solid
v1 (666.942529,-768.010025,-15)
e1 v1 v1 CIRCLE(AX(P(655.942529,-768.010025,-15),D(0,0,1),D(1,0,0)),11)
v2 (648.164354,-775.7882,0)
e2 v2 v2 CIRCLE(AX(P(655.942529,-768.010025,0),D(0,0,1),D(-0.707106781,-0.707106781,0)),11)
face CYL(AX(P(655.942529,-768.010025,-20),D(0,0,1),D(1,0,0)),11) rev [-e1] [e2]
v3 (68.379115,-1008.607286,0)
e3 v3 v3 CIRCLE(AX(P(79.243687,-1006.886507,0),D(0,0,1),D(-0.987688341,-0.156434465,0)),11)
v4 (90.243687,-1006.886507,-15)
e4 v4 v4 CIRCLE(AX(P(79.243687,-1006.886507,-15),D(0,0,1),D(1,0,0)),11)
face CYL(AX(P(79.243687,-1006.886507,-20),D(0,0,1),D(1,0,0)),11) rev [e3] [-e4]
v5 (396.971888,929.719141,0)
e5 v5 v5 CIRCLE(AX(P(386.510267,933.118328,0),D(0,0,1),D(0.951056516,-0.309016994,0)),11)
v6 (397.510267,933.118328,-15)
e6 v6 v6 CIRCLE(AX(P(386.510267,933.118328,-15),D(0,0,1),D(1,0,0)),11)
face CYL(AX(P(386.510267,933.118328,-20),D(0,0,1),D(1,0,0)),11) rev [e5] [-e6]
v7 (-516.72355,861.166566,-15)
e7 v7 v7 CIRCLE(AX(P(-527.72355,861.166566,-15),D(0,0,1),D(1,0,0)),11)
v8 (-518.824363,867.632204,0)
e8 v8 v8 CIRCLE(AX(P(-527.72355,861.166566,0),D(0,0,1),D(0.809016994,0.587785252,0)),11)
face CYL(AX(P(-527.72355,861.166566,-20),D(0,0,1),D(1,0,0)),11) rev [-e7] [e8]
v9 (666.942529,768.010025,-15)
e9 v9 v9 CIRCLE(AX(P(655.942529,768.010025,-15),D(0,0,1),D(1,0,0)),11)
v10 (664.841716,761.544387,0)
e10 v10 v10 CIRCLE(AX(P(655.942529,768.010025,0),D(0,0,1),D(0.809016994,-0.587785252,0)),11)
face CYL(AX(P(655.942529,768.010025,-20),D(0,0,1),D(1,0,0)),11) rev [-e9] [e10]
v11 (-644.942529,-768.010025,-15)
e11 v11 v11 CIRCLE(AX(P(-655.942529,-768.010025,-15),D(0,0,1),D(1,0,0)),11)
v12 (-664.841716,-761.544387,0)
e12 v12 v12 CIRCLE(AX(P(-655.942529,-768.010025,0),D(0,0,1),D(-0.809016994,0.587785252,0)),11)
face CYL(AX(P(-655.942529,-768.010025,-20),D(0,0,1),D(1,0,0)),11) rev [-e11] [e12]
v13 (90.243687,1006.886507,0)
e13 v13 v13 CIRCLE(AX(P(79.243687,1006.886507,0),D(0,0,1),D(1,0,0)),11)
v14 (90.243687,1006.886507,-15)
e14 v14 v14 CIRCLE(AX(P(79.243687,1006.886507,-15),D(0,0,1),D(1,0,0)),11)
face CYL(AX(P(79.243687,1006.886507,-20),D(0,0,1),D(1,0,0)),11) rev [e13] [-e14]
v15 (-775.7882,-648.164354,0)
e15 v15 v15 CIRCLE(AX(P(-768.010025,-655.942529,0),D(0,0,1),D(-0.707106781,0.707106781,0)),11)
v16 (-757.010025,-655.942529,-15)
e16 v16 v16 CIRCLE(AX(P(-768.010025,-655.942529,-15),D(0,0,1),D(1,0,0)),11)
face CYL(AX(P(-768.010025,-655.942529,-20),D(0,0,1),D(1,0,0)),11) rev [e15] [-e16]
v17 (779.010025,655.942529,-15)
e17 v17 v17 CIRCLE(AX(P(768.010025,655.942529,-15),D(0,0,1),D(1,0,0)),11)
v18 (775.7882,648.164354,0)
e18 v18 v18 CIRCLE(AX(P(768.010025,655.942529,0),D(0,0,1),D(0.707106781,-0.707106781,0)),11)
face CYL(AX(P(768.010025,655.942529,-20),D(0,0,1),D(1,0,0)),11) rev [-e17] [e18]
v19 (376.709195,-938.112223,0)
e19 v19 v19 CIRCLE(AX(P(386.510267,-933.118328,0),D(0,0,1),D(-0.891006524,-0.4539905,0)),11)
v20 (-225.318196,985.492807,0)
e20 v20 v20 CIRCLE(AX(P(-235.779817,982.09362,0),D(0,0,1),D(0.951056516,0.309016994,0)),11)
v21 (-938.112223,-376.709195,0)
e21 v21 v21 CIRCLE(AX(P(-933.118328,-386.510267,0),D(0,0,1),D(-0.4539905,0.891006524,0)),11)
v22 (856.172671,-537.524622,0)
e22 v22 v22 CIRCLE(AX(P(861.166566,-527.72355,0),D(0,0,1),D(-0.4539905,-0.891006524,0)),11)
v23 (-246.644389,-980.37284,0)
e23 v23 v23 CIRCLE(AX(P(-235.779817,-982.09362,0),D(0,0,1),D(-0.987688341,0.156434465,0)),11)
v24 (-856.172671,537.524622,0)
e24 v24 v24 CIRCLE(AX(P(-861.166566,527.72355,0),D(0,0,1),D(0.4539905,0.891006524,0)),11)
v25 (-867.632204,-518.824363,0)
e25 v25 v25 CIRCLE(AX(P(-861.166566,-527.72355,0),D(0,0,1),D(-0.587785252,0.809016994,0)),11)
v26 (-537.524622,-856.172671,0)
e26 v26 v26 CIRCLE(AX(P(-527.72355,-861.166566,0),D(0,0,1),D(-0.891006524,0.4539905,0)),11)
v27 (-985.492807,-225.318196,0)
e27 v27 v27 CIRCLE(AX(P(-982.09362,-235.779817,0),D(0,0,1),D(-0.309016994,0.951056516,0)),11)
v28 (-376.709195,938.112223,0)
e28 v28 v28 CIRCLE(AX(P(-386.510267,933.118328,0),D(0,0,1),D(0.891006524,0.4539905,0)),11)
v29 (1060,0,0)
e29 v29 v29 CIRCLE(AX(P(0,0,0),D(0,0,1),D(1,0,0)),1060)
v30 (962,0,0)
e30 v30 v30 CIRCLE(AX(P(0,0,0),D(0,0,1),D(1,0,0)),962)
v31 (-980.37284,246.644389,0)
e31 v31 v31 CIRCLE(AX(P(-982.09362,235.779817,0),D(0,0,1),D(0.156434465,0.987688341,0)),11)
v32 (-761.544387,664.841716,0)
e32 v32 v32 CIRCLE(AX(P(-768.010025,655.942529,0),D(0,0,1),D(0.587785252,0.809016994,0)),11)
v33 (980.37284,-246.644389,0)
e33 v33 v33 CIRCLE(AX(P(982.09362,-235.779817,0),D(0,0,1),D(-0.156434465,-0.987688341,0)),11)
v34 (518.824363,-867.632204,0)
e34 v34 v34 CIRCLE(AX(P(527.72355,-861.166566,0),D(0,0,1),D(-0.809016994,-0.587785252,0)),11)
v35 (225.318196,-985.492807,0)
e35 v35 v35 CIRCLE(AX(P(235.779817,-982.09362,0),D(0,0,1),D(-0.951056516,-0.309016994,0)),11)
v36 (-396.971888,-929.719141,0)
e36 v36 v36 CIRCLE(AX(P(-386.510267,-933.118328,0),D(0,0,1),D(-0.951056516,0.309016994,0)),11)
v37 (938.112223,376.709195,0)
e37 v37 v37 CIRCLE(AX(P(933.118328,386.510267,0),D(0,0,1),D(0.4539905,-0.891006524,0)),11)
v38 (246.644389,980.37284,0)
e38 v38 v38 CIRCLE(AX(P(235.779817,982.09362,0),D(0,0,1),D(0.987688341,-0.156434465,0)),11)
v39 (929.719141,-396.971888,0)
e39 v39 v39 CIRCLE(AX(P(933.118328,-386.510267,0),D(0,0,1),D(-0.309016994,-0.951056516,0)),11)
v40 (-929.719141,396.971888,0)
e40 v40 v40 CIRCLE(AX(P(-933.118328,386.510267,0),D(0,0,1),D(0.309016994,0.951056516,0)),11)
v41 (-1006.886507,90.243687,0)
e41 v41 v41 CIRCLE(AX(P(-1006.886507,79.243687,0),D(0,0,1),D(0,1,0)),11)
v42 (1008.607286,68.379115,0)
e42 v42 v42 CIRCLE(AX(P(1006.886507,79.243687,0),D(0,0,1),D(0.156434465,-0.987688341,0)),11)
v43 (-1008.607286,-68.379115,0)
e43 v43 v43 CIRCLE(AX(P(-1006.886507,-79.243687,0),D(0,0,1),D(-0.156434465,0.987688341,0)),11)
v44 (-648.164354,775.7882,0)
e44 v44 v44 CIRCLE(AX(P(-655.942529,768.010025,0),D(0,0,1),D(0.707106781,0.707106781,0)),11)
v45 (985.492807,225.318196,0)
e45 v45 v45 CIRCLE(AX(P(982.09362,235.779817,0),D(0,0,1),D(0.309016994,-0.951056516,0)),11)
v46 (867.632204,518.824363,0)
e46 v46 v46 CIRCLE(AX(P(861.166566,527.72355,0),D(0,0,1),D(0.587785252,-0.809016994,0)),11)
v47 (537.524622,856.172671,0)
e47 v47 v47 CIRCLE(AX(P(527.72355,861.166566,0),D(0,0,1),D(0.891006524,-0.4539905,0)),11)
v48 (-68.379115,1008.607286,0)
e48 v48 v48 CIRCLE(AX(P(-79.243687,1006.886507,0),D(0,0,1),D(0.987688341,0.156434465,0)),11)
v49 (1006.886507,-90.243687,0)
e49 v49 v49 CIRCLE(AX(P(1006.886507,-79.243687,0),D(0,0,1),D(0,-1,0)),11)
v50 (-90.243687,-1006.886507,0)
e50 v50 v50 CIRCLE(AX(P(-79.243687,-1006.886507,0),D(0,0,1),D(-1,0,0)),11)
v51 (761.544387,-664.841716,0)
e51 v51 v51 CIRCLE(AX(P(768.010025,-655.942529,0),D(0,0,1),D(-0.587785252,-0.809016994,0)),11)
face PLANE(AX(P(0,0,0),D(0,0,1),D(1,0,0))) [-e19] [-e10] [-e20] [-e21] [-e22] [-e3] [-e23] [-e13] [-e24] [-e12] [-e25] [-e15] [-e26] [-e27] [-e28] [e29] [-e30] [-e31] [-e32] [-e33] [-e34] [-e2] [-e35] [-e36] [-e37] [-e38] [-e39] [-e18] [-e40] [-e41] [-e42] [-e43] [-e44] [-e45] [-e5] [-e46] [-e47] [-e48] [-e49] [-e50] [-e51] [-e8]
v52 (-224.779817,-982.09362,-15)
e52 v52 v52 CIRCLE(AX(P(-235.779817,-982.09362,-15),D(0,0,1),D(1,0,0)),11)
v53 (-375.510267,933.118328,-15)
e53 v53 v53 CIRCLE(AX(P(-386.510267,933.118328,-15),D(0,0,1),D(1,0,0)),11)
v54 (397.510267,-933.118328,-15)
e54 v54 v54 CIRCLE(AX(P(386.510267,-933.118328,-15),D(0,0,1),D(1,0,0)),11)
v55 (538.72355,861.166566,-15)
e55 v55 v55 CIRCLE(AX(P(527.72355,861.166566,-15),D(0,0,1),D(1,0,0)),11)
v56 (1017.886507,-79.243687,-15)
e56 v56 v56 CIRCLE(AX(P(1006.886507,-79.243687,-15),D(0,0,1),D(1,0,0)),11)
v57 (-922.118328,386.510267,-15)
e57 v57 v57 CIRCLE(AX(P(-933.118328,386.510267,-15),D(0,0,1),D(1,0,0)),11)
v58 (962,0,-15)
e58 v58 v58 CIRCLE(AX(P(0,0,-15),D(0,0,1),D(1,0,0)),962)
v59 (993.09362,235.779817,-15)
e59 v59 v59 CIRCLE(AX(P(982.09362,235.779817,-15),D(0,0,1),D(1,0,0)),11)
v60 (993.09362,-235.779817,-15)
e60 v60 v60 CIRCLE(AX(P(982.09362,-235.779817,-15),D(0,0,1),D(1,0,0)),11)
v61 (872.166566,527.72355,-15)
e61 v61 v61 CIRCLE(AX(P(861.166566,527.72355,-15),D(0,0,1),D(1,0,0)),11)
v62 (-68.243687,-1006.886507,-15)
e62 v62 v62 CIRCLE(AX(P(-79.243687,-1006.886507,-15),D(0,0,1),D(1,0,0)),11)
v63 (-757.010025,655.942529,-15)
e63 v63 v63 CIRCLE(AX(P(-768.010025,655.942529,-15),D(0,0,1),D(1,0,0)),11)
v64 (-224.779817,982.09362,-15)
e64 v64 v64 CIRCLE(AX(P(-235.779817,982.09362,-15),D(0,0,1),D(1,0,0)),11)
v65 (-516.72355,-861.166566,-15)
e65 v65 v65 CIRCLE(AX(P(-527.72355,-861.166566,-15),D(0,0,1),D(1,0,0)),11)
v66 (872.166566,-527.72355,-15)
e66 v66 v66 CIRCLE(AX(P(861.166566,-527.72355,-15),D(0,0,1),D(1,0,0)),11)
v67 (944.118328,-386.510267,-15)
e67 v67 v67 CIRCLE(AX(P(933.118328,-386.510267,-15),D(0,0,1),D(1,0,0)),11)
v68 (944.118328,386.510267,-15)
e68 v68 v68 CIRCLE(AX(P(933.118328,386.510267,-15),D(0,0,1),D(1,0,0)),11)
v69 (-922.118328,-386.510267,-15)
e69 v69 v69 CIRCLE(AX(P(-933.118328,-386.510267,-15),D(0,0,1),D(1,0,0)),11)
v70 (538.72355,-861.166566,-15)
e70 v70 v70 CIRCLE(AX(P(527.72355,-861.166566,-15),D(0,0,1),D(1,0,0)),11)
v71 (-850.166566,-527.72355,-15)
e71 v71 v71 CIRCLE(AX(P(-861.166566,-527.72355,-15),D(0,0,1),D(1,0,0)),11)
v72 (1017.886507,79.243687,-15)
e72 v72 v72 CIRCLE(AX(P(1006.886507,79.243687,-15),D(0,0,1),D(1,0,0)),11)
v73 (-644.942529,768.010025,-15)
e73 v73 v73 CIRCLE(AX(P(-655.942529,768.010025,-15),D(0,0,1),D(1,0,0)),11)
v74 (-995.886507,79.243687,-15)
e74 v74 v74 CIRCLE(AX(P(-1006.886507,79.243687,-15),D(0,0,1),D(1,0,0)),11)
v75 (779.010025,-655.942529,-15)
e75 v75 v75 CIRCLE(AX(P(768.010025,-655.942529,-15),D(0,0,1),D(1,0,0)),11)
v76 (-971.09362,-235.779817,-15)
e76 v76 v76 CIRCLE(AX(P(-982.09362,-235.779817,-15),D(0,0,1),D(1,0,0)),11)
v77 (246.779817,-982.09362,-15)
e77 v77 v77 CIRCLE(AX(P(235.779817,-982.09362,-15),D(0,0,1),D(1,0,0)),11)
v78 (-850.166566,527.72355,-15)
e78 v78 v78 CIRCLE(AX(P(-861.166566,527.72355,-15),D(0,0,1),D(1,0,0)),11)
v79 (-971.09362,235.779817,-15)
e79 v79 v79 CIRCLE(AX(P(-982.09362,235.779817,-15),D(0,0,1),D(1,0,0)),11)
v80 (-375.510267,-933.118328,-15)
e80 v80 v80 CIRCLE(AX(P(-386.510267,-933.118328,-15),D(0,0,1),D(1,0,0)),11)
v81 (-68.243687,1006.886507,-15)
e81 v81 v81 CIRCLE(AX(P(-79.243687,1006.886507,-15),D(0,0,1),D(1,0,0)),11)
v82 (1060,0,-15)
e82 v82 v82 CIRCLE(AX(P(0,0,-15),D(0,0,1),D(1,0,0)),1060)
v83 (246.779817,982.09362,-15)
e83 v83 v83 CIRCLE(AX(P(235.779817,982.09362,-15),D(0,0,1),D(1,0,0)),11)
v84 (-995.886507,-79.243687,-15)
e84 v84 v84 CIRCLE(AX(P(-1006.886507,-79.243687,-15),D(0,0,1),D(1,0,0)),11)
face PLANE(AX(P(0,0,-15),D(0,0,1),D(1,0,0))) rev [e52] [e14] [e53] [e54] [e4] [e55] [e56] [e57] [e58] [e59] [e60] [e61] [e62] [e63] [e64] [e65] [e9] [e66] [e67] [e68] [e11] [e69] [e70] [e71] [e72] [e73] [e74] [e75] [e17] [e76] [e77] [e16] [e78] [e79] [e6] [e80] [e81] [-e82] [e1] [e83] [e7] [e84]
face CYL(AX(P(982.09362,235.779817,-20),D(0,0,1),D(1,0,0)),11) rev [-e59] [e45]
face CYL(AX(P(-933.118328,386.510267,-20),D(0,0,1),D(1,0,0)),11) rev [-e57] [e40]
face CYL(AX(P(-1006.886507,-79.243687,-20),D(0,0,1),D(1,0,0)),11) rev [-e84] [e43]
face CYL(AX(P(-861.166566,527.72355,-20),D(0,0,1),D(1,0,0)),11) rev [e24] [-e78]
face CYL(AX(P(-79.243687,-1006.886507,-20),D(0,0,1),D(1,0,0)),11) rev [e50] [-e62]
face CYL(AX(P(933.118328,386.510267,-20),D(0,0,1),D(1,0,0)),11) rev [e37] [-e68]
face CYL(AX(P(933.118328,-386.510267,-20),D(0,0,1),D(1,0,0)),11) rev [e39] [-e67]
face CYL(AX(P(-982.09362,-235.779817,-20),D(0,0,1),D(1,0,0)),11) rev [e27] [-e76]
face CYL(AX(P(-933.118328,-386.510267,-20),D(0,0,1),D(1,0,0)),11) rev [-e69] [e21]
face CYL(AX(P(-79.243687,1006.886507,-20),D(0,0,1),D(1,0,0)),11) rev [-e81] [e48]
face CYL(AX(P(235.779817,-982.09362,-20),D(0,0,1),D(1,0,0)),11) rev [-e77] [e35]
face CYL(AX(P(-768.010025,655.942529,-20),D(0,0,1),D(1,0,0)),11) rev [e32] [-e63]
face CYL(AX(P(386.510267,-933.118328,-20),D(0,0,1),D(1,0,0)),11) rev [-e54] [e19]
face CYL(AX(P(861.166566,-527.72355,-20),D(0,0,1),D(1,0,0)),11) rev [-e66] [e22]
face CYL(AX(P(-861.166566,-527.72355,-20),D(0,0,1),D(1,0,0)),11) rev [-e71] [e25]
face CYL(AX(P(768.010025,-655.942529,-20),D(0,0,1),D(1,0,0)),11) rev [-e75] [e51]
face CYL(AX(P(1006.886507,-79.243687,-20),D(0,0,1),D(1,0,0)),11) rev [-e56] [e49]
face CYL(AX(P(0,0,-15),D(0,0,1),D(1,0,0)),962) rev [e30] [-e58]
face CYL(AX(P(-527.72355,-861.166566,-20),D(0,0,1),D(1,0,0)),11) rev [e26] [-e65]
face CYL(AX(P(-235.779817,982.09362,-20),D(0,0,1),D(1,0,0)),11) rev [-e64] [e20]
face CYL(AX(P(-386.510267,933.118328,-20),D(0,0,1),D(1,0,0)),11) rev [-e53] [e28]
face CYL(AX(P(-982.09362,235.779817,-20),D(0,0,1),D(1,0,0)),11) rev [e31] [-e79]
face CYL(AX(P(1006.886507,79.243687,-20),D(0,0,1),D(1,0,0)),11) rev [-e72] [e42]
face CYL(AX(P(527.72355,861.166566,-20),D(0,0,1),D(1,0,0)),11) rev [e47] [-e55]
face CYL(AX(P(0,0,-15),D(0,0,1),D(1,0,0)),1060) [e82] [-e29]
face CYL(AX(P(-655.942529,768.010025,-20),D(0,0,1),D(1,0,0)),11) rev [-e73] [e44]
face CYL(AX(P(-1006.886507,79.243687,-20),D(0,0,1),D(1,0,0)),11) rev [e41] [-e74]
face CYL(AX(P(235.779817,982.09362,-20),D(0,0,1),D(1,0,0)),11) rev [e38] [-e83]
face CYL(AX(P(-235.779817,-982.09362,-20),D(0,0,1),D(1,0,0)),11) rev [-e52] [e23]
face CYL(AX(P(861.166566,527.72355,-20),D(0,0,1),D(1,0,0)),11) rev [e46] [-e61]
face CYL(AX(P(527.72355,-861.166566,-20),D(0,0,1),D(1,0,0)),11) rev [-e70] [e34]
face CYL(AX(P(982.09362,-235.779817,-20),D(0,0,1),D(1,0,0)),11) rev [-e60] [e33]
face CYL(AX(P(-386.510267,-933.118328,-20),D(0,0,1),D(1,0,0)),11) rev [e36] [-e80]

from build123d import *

# Parameters (mm, degrees)
SKETCH1_R          = 1060
SKETCH1_R_2        = 962
BASE_FLANGE1_DEPTH = 15
SKETCH2_R          = 11
CUT_EXTRUDE1_DEPTH = 20
CIRPATTERN1_COUNT  = 40


# Sheet-metal steps are written as plain solids
with BuildPart() as part:
    # Sketch1 → Base-Flange1 (new body)
    with BuildSketch(Plane.XY):
        Circle(SKETCH1_R)
        Circle(SKETCH1_R_2, mode=Mode.SUBTRACT)
    extrude(amount=-BASE_FLANGE1_DEPTH)

    # Sketch2 → Cut-Extrude1 (cut)
    with BuildSketch(Plane.XY):
        with Locations((79.243686685, 1006.88650707)):
            Circle(SKETCH2_R)
    cut_extrude1 = extrude(amount=-CUT_EXTRUDE1_DEPTH, mode=Mode.SUBTRACT)

    # CirPattern1: Cut-Extrude1 ×40 about axis
    cirpattern1_axis = Axis((0, 0, 0), (0, 0, 1))
    for i in range(1, CIRPATTERN1_COUNT):
        add(cut_extrude1.rotate(cirpattern1_axis, i * 360 / CIRPATTERN1_COUNT), mode=Mode.SUBTRACT)


solid = part.part
